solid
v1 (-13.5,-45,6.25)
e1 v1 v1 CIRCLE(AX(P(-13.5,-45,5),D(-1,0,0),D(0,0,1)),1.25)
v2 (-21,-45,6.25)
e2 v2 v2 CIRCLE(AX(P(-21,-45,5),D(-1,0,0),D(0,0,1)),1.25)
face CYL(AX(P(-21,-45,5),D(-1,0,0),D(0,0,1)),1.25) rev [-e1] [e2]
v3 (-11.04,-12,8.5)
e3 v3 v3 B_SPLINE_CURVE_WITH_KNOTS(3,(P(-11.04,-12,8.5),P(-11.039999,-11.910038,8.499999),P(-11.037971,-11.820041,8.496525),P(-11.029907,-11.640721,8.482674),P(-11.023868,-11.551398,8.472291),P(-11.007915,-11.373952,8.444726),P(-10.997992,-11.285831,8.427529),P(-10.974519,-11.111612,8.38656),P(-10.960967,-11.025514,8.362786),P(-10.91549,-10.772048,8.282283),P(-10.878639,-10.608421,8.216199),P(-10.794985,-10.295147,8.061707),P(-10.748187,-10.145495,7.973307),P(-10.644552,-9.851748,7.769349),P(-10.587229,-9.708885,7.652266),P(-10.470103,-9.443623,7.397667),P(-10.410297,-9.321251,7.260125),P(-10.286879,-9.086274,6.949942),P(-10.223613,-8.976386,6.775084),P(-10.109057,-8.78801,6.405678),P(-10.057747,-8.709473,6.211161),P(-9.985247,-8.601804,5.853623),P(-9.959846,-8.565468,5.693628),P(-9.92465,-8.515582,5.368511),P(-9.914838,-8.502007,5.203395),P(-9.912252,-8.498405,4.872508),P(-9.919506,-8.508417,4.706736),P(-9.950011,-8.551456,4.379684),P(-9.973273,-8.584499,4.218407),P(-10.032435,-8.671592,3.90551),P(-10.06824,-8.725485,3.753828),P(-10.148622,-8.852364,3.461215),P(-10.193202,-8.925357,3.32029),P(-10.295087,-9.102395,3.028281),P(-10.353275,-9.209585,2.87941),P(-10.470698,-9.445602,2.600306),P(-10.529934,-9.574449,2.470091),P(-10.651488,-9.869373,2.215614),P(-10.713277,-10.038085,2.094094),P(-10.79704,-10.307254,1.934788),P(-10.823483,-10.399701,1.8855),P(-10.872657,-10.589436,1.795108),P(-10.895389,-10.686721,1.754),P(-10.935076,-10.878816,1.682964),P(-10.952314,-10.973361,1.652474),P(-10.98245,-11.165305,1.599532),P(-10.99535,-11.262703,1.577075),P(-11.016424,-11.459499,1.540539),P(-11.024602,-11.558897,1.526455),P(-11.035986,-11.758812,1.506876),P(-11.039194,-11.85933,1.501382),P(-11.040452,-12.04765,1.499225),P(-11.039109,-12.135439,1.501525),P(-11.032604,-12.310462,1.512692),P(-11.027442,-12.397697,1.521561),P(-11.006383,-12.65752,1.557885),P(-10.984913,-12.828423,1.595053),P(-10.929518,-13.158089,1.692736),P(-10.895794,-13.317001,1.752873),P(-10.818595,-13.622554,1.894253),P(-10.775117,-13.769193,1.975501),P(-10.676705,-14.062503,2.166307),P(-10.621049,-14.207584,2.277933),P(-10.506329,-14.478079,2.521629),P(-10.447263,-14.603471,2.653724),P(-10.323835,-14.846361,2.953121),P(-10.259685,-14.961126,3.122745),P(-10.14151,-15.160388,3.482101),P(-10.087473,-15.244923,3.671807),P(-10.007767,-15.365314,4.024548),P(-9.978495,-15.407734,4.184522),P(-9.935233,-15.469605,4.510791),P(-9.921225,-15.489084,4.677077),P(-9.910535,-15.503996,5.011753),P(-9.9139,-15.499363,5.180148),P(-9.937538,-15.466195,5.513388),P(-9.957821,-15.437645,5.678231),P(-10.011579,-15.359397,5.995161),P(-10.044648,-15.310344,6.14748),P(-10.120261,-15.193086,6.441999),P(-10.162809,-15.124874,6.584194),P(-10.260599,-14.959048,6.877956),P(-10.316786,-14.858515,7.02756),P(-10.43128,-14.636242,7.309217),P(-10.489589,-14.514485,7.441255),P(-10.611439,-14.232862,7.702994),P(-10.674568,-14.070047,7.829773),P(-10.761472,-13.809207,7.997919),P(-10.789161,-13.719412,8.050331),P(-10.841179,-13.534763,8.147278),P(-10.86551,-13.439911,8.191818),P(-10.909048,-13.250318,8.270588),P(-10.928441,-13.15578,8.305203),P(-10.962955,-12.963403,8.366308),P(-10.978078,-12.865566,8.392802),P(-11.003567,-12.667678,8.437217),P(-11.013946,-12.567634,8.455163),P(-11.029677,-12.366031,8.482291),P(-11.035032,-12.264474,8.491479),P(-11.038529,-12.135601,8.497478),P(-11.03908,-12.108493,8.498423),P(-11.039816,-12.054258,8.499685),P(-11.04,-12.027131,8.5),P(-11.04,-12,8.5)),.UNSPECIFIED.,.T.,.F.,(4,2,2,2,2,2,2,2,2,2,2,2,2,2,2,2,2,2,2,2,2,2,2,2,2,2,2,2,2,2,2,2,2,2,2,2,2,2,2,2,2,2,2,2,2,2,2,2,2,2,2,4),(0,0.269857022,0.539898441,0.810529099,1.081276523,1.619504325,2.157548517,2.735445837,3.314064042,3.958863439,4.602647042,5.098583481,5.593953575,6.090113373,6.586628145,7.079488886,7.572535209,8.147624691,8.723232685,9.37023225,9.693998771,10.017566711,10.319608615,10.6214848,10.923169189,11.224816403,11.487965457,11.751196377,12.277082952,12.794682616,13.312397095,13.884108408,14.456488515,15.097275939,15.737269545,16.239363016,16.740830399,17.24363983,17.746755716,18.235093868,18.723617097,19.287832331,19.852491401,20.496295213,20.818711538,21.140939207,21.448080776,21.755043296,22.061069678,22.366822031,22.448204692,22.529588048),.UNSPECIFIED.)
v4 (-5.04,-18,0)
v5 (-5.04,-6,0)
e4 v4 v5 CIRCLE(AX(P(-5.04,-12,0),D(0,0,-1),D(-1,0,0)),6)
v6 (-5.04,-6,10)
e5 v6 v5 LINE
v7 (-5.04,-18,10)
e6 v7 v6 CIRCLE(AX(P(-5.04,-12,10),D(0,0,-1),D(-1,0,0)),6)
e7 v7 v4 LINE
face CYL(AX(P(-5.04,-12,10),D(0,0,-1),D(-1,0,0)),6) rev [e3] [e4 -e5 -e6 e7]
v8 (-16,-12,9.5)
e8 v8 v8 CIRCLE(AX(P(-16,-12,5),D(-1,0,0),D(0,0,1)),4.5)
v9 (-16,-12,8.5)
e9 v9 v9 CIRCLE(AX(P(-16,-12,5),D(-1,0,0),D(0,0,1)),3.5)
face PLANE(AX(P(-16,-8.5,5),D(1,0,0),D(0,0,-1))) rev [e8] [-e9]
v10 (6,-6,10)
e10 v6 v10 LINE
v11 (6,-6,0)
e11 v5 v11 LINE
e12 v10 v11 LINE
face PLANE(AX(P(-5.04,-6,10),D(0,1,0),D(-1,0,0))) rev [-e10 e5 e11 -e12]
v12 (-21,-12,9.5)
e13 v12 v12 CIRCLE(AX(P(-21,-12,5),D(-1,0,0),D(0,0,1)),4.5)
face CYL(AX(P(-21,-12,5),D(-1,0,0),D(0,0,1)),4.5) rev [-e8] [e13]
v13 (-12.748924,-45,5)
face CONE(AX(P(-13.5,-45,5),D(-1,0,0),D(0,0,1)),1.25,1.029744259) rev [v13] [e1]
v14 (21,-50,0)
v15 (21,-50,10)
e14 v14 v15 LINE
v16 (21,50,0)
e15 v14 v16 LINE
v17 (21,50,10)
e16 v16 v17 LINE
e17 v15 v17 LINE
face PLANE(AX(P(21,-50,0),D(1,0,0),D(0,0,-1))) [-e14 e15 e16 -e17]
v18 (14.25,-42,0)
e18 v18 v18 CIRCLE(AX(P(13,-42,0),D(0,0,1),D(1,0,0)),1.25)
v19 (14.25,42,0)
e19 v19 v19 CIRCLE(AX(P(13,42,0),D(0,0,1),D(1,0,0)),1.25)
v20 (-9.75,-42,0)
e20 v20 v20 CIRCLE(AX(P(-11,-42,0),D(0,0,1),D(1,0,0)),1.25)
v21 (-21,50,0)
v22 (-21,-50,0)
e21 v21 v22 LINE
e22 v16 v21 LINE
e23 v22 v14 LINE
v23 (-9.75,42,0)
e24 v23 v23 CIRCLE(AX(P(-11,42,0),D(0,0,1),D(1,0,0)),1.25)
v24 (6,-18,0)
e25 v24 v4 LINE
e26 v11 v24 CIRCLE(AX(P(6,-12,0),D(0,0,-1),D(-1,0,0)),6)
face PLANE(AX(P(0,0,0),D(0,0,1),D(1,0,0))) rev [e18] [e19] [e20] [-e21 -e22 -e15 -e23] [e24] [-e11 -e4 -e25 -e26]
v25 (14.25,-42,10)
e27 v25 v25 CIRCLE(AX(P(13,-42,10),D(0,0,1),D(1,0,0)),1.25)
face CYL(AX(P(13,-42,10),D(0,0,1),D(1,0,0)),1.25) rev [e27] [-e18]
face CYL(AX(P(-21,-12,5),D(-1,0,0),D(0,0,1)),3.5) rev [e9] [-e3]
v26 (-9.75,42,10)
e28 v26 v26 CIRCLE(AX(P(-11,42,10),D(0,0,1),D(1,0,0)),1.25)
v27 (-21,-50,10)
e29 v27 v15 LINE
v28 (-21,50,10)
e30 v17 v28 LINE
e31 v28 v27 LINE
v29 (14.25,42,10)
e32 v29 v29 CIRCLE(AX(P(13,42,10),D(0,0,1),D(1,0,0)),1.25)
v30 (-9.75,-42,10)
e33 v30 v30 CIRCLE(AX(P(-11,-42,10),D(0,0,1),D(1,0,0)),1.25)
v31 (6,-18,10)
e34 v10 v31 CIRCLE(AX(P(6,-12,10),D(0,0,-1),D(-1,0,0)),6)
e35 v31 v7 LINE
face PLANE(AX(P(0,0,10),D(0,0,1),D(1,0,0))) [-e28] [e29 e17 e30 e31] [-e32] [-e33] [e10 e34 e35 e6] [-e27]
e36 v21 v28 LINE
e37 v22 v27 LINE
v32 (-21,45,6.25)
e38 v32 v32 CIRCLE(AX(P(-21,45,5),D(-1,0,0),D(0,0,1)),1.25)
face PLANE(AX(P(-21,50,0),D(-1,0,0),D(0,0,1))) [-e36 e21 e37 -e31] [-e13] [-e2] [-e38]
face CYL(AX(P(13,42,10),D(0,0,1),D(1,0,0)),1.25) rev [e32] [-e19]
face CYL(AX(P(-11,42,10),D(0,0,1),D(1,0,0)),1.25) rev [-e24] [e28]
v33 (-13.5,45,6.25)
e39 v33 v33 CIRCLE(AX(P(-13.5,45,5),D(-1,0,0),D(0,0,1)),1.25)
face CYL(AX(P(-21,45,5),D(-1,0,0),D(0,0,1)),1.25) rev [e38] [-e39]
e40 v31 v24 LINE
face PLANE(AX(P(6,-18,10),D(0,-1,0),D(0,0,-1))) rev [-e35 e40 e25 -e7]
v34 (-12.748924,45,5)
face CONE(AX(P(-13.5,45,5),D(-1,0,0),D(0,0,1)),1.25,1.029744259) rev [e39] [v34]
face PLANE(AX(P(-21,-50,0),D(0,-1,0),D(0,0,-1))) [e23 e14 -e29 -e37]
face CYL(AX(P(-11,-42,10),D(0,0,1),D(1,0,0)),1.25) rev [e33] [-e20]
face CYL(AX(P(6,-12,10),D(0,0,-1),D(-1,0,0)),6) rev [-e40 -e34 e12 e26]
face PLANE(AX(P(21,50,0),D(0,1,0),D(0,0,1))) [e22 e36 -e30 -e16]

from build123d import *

# Parameters (mm, degrees)
SKETCH1_W                      = 42
SKETCH1_H                      = 100
BOSS_EXTRUDE1_DEPTH            = 10
CUT_EXTRUDE1_DEPTH             = 56.145262716
F_2_5_2_5_DIAMETER_HOLE1_D     = 2.5
F_2_5_2_5_DIAMETER_HOLE2_D     = 2.5
F_2_5_2_5_DIAMETER_HOLE2_DEPTH = 7.5
F_2_5_2_5_DIAMETER_HOLE2_TIP   = 0.751075774


# Read off the part's stored shape, not the designer's step: CBORE for M6 Hex Head Bolt1
with BuildPart() as part:
    # Sketch1 → Boss-Extrude1 (new body)
    with BuildSketch(Plane.XY.offset(10)):
        Rectangle(SKETCH1_W, SKETCH1_H)
    extrude(amount=-BOSS_EXTRUDE1_DEPTH)

    # Sketch2 → Cut-Extrude1 (cut, through all)
    with BuildSketch(Plane(origin=(0, 0, 0), x_dir=(-1, 0, 0), z_dir=(0, 0, -1))):
        with BuildLine():
            Line((5.04, -6), (-6, -6))
            ThreePointArc((-6, -6), (-12, -12), (-6, -18))
            Line((-6, -18), (5.04, -18))
            ThreePointArc((5.04, -18), (11.04, -12), (5.04, -6))
        make_face()
    extrude(amount=-CUT_EXTRUDE1_DEPTH, mode=Mode.SUBTRACT)

    # Ø2.5 (2.5) Diameter Hole1 (through all)
    with Locations(Plane.XY.offset(10)):
        with Locations((13, 42), (-11, 42), (-11, -42), (13, -42)):
            Hole(F_2_5_2_5_DIAMETER_HOLE1_D / 2)

    # CBORE for M6 Hex Head Bolt1 outline → CBORE for M6 Hex Head Bolt1 (revolve, cut)
    with BuildSketch(Plane(origin=(0, -12, 5), x_dir=(0, 1, 0), z_dir=(0, 0, -1))):
        Polygon((3.5, -16), (3.5, -9.913035616), (0, -9.913035616), (0, -21), (4.5, -21), (4.5, -16), align=None)
    revolve(axis=Axis((0, -12, 5), (1, 0, 0)), mode=Mode.SUBTRACT)

    # Ø2.5 (2.5) Diameter Hole2
    with Locations(Plane.ZY.offset(21)):
        with Locations((5, 45), (5, -45)):
            Hole(F_2_5_2_5_DIAMETER_HOLE2_D / 2, depth=F_2_5_2_5_DIAMETER_HOLE2_DEPTH)
            with Locations((0, 0, -(F_2_5_2_5_DIAMETER_HOLE2_DEPTH + F_2_5_2_5_DIAMETER_HOLE2_TIP / 2))):  # 118° drill point
                Cone(0, F_2_5_2_5_DIAMETER_HOLE2_D / 2, F_2_5_2_5_DIAMETER_HOLE2_TIP, mode=Mode.SUBTRACT)


solid = part.part
